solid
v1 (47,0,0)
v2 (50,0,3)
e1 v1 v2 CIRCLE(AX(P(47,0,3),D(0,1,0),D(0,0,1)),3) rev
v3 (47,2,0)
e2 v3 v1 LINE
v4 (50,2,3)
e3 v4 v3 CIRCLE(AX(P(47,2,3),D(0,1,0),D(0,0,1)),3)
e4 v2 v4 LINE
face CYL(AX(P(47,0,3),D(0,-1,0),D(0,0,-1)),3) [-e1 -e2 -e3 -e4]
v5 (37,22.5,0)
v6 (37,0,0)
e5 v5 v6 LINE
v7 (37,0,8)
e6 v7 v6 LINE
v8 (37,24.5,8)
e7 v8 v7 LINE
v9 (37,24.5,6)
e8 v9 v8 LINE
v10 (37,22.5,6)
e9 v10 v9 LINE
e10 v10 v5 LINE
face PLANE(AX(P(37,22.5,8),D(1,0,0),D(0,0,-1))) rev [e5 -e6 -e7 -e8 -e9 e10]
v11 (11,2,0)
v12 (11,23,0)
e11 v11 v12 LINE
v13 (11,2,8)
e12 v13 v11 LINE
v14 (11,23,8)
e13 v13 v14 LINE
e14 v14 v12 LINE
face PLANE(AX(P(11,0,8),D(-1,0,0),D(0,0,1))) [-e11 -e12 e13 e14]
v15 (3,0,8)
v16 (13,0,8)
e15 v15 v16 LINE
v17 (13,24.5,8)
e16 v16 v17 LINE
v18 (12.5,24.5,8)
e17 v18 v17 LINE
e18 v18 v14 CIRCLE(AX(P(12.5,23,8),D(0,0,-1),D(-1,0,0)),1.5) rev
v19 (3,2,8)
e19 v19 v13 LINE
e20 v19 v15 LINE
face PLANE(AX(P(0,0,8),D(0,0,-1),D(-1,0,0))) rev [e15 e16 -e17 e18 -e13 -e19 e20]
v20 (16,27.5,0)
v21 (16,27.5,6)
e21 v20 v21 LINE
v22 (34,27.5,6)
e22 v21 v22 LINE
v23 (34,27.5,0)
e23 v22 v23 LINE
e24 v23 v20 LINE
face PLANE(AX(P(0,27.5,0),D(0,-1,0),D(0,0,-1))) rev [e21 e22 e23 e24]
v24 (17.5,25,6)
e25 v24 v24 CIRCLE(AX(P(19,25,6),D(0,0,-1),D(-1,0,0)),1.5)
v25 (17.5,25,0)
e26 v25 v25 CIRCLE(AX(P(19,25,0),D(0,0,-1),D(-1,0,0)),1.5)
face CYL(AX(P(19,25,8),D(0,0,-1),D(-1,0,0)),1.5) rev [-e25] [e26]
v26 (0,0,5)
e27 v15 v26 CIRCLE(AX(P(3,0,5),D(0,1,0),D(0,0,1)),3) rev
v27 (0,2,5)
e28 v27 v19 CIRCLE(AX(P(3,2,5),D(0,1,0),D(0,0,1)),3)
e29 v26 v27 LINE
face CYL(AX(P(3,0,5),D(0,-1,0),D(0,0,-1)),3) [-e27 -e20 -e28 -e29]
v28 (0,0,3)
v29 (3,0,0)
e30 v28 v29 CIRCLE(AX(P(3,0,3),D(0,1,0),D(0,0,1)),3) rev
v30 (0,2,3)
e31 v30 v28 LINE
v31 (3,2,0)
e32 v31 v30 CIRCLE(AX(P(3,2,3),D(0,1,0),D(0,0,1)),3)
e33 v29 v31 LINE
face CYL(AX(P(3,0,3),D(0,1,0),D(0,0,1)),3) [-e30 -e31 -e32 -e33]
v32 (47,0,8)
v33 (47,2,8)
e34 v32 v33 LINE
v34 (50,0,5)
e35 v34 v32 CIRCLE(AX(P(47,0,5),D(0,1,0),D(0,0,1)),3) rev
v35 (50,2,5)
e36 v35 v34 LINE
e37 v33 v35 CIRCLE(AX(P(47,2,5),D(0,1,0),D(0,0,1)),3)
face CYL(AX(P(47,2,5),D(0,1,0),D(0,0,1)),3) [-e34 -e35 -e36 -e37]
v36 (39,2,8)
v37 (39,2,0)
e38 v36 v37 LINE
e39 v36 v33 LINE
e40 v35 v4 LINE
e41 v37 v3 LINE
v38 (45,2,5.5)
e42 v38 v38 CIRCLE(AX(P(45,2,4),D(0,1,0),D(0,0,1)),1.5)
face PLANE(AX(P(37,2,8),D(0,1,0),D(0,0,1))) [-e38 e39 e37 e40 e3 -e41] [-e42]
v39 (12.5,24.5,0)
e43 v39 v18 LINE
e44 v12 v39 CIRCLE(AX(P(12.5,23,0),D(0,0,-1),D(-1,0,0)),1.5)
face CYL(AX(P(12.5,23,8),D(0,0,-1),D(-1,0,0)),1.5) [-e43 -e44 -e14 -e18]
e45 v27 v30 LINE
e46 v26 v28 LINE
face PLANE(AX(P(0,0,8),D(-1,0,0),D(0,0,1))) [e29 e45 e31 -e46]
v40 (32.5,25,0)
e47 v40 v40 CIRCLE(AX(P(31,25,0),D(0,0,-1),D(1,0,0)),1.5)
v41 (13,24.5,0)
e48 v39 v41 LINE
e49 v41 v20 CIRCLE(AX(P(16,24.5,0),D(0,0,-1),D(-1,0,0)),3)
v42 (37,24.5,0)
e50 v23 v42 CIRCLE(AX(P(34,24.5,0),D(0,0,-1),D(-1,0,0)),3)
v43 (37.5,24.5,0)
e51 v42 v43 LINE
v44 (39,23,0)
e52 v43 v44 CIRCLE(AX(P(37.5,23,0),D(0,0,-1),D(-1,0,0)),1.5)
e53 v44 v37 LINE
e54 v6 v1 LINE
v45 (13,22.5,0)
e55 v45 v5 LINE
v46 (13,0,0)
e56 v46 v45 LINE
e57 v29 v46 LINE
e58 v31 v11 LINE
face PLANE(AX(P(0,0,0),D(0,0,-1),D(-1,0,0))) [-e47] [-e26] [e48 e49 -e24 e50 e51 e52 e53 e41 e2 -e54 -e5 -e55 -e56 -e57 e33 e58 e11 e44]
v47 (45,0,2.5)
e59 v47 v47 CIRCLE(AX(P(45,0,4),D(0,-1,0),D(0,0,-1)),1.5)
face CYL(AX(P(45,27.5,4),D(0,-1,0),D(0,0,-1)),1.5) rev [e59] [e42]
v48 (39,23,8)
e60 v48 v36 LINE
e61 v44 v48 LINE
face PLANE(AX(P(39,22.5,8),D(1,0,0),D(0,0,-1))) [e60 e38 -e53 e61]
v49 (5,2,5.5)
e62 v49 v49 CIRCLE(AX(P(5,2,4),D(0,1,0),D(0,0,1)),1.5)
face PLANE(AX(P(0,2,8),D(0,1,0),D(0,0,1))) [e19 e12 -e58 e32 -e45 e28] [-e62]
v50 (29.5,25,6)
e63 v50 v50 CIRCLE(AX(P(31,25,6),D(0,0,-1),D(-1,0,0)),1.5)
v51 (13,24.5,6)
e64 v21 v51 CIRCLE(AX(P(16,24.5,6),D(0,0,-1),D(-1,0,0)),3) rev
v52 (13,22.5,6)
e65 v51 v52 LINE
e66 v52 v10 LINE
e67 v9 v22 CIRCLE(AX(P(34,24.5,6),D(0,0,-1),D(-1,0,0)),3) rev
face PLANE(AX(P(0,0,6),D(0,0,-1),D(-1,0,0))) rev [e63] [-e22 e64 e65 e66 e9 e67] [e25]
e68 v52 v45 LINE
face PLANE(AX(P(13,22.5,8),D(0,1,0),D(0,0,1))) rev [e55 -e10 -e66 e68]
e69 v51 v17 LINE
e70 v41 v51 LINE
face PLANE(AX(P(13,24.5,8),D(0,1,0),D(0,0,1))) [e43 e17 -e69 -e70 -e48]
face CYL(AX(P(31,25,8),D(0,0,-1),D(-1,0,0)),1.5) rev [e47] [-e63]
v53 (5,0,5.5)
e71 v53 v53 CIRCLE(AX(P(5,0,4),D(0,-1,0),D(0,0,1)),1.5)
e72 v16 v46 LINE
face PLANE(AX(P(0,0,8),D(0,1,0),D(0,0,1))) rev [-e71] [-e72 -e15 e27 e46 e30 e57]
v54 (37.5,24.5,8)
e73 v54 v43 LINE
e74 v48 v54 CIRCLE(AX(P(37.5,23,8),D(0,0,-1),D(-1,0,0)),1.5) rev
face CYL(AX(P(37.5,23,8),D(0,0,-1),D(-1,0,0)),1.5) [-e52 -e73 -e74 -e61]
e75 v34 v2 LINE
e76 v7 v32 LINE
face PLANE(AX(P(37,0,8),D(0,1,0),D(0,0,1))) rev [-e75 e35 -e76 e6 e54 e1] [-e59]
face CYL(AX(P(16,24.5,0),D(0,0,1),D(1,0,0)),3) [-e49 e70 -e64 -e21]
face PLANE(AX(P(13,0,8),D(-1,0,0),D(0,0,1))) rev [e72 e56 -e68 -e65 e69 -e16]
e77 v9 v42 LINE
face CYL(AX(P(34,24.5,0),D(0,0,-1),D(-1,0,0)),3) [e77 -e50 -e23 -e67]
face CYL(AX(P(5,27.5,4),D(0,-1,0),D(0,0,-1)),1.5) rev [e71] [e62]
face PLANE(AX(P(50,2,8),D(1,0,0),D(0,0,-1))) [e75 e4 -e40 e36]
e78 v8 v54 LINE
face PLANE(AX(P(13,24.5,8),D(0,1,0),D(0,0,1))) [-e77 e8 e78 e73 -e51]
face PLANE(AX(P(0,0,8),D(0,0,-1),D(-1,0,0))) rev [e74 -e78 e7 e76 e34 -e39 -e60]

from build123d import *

# Parameters (mm, degrees)
EXTRUIR_L_MINA1_DEPTH   = 8
CROQUIS2_W              = 24
CROQUIS2_H              = 2
CORTAR_EXTRUIR1_DEPTH   = 2
CROQUIS3_W              = 24
CROQUIS3_H              = 6
SALIENTE_EXTRUIR1_DEPTH = 3
CROQUIS4_R              = 1.5
CORTAR_EXTRUIR2_DEPTH   = 58.621610529
CROQUIS5_R              = 1.5
CORTAR_EXTRUIR3_DEPTH   = 58.621610529
REDONDEO1_R             = 3
REDONDEO2_R             = 1.5


with BuildPart() as part:
    # Croquis1 → Extruir-Lámina1 (new body)
    with BuildSketch(Plane.XY):
        Polygon((0, 0), (13, 0), (13, 22.5), (37, 22.5), (37, 0), (50, 0), (50, 2), (39, 2), (39, 24.5), (11, 24.5), (11, 2), (0, 2), align=None)
    extrude(amount=EXTRUIR_L_MINA1_DEPTH)

    # Croquis2 → Cortar-Extruir1 (cut)
    with BuildSketch(Plane.XY.offset(8)):
        with Locations((25, 23.5)):
            Rectangle(CROQUIS2_W, CROQUIS2_H)
    extrude(amount=-CORTAR_EXTRUIR1_DEPTH, mode=Mode.SUBTRACT)

    # Croquis3 → Saliente-Extruir1 (add)
    with BuildSketch(Plane(origin=(0, 24.5, 0), x_dir=(1, 0, 0), z_dir=(0, 1, 0))):
        with Locations((25, -3)):
            Rectangle(CROQUIS3_W, CROQUIS3_H)
    extrude(amount=SALIENTE_EXTRUIR1_DEPTH)

    # Croquis4 → Cortar-Extruir2 (cut, through all)
    with BuildSketch(Plane(origin=(0, 0, 0), x_dir=(-1, 0, 0), z_dir=(0, 0, -1))):
        with Locations((-19, 25)):
            Circle(CROQUIS4_R)
        with Locations((-31, 25)):
            Circle(CROQUIS4_R)
    extrude(amount=-CORTAR_EXTRUIR2_DEPTH, mode=Mode.SUBTRACT)

    # Croquis5 → Cortar-Extruir3 (cut, through all)
    with BuildSketch(Plane.XZ):
        with Locations(Location((45, 4, 0), (0, 0, 270))):
            Circle(CROQUIS5_R)
        with Locations(Location((5, 4, 0), (0, 0, 90))):
            Circle(CROQUIS5_R)
    extrude(amount=-CORTAR_EXTRUIR3_DEPTH, mode=Mode.SUBTRACT)

    # Redondeo1
    redondeo1_edges = [part.edges().sort_by_distance(p)[0] for p in [
        (13, 27.5, 3),
        (37, 27.5, 3),
        (50, 1, 8),
        (50, 1, 0),
        (0, 1, 0),
        (0, 1, 8),
    ]]
    fillet(redondeo1_edges, radius=REDONDEO1_R - 0.0001)  # a hair under: the kernel refuses the full size

    # Redondeo2
    redondeo2_edges = [part.edges().sort_by_distance(p)[0] for p in [
        (11, 24.5, 4),
        (39, 24.5, 4),
    ]]
    fillet(redondeo2_edges, radius=REDONDEO2_R)


solid = part.part
